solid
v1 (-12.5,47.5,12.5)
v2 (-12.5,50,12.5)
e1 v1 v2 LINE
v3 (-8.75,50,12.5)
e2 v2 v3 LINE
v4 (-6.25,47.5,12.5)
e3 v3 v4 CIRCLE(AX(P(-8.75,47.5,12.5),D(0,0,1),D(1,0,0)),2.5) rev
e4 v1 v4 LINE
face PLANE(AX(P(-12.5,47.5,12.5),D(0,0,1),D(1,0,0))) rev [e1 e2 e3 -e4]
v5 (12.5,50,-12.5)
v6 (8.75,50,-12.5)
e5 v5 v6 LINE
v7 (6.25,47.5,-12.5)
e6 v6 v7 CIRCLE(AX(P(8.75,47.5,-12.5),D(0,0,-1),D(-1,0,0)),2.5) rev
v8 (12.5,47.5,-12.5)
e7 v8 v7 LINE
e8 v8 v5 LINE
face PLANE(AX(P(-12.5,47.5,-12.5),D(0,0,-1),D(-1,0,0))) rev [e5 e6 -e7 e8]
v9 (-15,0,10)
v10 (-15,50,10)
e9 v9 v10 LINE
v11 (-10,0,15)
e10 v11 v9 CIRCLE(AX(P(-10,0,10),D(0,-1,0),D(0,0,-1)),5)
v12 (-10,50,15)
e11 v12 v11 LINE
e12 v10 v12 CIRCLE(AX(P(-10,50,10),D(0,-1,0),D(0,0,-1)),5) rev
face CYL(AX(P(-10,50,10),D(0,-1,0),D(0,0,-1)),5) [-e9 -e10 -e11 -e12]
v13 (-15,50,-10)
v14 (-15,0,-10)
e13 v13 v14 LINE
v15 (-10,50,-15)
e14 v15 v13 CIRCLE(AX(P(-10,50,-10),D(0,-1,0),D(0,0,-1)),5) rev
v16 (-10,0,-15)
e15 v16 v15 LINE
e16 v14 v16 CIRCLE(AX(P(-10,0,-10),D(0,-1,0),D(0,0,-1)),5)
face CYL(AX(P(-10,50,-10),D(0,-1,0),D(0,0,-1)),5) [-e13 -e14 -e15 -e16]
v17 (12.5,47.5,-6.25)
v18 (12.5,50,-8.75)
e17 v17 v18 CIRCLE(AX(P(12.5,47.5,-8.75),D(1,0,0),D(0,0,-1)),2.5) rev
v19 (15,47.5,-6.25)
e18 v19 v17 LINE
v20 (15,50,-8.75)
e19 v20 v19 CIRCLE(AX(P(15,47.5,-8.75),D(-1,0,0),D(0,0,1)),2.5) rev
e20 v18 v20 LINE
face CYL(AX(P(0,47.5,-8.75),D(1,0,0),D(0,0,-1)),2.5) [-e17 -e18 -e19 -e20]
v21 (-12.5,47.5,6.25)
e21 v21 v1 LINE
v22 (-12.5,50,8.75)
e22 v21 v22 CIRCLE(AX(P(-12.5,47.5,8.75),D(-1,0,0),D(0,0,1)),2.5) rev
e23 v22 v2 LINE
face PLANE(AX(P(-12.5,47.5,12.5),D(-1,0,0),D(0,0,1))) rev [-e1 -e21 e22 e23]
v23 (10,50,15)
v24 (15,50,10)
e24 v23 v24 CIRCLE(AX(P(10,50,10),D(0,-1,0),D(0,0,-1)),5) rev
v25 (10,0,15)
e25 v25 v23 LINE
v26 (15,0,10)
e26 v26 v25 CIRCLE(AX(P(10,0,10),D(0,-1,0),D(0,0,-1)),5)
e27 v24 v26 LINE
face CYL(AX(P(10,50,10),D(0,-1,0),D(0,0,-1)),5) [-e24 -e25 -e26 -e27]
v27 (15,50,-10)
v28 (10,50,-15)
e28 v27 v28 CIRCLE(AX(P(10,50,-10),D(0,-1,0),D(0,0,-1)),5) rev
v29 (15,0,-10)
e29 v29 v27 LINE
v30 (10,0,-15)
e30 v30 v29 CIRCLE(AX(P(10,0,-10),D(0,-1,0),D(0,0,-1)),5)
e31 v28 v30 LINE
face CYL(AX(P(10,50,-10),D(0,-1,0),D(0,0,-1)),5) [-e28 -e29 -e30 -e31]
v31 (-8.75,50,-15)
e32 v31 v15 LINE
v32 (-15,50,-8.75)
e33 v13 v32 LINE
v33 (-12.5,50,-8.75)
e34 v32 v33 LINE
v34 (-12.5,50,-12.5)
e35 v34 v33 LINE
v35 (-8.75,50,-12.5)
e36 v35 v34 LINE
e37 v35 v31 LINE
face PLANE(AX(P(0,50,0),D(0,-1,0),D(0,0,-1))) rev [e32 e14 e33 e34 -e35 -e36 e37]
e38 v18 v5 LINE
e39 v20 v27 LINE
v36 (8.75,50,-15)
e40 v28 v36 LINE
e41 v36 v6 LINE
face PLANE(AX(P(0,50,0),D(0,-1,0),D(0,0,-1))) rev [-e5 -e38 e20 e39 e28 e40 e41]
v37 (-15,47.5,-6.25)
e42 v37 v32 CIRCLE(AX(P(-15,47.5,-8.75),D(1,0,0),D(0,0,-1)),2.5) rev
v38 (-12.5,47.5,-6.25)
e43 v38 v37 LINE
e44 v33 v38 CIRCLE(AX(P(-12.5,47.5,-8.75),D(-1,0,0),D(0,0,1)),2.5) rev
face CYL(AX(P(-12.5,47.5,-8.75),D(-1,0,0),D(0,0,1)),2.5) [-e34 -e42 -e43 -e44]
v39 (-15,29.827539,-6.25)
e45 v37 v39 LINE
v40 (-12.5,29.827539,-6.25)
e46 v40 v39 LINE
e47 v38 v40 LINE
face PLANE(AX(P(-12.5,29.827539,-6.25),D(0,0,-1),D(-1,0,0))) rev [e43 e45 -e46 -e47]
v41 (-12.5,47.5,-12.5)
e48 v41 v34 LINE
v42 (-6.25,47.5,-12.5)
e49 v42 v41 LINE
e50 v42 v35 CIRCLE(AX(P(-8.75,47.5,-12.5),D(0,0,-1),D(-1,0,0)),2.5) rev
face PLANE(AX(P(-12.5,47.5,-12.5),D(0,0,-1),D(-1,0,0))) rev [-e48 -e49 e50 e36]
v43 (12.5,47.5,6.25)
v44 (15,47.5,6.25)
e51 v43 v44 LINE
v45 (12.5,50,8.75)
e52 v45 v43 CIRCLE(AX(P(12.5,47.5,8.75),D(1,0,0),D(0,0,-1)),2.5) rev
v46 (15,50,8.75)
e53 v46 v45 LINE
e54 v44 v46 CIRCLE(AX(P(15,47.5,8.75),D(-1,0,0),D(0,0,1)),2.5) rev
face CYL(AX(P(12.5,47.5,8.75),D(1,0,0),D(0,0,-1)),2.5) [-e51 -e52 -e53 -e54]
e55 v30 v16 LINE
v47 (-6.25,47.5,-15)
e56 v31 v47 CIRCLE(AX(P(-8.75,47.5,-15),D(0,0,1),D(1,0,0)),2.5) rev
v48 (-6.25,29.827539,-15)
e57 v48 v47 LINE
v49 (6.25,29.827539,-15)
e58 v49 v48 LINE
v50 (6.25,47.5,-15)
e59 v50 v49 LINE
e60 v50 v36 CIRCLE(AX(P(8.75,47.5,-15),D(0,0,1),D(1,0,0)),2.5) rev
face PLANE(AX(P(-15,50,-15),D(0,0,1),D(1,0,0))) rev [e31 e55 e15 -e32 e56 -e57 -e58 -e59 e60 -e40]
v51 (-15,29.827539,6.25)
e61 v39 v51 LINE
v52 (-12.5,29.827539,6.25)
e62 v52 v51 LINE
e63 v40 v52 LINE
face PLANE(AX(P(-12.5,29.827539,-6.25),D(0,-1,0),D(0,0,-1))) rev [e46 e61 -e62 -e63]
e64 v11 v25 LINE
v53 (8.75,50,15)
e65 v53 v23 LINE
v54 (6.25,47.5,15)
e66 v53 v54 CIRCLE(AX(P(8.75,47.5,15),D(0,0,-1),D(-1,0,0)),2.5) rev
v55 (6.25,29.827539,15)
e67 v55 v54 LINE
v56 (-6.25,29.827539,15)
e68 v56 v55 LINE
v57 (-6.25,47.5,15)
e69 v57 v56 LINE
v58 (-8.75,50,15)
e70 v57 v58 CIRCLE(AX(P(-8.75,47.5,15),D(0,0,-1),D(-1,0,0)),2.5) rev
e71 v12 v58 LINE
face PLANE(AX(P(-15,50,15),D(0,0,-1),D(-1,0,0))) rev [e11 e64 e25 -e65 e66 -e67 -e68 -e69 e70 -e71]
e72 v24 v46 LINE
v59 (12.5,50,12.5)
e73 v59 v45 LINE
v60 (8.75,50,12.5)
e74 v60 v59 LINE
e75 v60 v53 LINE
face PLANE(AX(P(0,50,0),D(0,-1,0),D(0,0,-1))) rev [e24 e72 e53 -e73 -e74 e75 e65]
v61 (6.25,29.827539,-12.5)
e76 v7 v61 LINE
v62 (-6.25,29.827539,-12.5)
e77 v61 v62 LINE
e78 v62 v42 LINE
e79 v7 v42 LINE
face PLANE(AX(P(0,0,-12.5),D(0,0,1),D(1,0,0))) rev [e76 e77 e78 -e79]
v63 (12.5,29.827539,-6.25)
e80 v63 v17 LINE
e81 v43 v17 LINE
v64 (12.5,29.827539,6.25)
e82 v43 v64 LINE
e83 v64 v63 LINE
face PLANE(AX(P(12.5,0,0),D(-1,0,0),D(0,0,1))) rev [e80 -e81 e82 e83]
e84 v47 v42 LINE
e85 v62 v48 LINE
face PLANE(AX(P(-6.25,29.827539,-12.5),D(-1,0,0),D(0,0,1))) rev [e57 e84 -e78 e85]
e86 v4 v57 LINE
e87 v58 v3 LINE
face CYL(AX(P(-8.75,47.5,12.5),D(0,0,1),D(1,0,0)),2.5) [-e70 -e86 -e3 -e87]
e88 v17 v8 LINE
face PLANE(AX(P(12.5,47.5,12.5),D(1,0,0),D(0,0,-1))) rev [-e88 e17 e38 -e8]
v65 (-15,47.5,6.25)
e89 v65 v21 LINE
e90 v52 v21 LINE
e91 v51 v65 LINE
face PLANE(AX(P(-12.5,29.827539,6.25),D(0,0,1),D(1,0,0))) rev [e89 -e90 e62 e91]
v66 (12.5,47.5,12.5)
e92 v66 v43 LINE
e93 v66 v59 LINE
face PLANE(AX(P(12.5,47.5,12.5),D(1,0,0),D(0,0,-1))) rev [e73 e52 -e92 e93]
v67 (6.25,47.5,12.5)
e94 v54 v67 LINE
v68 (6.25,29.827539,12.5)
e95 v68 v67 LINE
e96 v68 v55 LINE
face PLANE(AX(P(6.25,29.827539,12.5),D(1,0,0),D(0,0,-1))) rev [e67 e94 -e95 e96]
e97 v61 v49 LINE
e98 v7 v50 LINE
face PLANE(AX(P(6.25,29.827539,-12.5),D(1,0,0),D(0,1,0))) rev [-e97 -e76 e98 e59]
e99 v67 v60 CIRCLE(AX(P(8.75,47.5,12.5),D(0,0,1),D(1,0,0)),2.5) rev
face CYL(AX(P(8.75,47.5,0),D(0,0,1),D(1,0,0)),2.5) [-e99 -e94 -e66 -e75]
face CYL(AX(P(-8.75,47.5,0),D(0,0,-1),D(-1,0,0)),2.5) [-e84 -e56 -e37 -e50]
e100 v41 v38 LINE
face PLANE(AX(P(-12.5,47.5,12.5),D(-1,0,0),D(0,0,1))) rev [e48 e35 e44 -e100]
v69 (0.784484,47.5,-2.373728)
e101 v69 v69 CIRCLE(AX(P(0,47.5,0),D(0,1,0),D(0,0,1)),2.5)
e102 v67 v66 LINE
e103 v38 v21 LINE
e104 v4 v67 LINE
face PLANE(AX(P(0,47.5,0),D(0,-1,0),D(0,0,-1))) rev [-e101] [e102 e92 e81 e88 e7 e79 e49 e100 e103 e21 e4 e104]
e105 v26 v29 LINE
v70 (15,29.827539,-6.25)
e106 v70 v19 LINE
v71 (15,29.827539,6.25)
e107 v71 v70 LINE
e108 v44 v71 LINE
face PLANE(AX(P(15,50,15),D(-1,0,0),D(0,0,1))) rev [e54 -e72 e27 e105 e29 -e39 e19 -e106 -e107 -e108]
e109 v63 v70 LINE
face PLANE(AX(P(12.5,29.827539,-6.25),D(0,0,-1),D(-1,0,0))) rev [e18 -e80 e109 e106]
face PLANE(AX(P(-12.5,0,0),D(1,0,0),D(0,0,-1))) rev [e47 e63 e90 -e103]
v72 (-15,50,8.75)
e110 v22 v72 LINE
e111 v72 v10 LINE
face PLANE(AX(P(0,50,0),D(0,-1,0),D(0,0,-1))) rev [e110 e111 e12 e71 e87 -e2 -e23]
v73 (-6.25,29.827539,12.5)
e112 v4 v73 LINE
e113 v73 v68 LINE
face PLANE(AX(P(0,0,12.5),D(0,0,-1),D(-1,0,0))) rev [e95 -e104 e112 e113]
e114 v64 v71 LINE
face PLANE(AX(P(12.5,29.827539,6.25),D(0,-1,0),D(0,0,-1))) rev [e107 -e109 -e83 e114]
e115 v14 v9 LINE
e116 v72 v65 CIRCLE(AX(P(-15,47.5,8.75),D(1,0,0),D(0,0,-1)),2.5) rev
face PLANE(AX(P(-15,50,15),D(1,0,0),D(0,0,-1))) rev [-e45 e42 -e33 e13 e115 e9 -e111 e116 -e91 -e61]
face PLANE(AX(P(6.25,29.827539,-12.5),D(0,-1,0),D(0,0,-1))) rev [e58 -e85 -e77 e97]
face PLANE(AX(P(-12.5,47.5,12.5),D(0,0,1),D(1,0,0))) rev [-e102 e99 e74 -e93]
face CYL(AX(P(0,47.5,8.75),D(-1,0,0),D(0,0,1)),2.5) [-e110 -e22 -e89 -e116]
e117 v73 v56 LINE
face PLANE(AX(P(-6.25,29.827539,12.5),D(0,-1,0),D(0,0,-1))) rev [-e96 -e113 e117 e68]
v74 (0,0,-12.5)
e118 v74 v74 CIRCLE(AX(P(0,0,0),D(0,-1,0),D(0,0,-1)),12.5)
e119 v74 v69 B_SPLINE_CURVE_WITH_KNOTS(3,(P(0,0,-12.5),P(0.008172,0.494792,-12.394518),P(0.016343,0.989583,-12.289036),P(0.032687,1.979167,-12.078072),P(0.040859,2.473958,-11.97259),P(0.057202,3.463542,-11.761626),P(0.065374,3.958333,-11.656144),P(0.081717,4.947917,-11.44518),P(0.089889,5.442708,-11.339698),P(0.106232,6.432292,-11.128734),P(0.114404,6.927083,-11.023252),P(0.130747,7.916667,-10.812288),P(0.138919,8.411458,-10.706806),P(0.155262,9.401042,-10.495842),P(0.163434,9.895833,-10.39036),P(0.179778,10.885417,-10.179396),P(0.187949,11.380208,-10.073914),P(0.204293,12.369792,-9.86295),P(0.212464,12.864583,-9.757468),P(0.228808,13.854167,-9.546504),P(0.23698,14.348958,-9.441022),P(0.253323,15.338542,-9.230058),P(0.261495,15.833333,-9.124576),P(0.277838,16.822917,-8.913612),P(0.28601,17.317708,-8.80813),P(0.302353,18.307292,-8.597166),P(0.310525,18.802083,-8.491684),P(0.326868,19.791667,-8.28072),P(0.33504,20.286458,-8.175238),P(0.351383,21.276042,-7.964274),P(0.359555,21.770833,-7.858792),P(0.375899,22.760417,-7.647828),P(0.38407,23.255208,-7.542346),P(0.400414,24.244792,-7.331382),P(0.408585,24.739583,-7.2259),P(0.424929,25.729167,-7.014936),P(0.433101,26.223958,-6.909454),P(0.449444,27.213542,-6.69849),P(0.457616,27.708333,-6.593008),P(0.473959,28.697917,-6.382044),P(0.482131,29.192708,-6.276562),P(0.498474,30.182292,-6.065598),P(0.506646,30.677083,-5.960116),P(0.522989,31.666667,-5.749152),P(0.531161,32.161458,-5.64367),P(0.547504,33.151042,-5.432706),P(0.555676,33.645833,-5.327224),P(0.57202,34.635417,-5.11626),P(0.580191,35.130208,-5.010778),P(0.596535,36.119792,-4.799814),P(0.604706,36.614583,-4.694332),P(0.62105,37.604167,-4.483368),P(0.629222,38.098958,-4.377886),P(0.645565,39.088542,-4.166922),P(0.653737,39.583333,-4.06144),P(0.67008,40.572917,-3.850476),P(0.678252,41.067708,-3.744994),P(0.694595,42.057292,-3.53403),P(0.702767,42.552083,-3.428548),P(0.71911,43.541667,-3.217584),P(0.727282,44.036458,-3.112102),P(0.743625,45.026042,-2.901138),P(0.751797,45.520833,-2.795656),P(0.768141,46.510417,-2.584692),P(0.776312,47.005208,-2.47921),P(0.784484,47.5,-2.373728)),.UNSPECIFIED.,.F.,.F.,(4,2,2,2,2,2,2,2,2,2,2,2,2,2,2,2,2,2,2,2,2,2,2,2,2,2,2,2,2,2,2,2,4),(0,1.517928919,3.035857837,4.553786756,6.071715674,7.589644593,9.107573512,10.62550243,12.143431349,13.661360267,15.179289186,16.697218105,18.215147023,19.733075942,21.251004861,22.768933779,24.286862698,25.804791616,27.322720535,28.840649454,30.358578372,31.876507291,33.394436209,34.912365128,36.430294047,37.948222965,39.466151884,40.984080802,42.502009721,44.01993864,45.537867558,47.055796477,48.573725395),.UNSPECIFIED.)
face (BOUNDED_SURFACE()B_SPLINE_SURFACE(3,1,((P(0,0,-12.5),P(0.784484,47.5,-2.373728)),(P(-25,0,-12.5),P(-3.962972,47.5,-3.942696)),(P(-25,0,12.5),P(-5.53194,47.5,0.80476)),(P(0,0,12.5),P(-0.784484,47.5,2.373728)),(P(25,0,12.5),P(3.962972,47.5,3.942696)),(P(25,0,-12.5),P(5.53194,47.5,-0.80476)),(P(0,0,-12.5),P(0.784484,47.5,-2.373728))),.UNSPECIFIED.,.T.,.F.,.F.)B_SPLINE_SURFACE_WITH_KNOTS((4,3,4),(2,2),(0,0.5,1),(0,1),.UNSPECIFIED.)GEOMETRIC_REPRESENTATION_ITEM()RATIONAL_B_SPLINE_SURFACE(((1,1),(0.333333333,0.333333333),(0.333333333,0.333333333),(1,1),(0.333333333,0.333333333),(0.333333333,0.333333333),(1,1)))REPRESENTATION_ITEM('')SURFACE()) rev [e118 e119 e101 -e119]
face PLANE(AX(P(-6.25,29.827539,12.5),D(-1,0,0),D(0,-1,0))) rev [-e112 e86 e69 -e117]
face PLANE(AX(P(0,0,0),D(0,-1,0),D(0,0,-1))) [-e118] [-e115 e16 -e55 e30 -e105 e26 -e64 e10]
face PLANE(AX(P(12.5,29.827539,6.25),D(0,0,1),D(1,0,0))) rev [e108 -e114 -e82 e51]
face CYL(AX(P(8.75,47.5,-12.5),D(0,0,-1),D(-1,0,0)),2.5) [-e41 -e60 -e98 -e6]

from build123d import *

# Parameters (mm, degrees)
SKETCH2_W           = 30
SKETCH2_H           = 30
BOSS_EXTRUDE1_DEPTH = 50
SKETCH3_W           = 25
SKETCH3_H           = 25
CUT_EXTRUDE1_DEPTH  = 2.5
FILLET1_R           = 5
SKETCH9_W           = 12.5
SKETCH9_H           = 20.172460503
CUT_EXTRUDE2_DEPTH  = 2.5
CIRPATTERN1_COUNT   = 4
FILLET2_R           = 2.5


with BuildPart() as part:
    # Sketch2 → Boss-Extrude1 (new body)
    with BuildSketch(Plane(origin=(0, 0, 0), x_dir=(1, 0, 0), z_dir=(0, 1, 0))):
        Rectangle(SKETCH2_W, SKETCH2_H)
    extrude(amount=BOSS_EXTRUDE1_DEPTH)

    # Sketch3 → Cut-Extrude1 (cut)
    with BuildSketch(Plane(origin=(0, 50, 0), x_dir=(1, 0, 0), z_dir=(0, 1, 0))):
        Rectangle(SKETCH3_W, SKETCH3_H)
    extrude(amount=-CUT_EXTRUDE1_DEPTH, mode=Mode.SUBTRACT)

    # Fillet1
    fillet1_edges = [part.edges().sort_by_distance(p)[0] for p in [
        (15, 25, 15),
        (-15, 25, 15),
        (-15, 25, -15),
        (15, 25, -15),
    ]]
    fillet(fillet1_edges, radius=FILLET1_R)

    # Cut-Loft2: read off the stored shape, not the designer's step
    # Cut-Loft2: loft between two sections, ruled curve by curve
    cut_loft2_from = [
        Edge.make_bspline([(0, 0, -12.5), (-25, 0, -12.5), (-25, 0, 12.5), (0, 0, 12.5), (25, 0, 12.5), (25, 0, -12.5), (0, 0, -12.5)], [0, 0, 0, 0, 0.5, 0.5, 0.5, 1, 1, 1, 1], 3, [1, 0.333333333, 0.333333333, 1, 0.333333333, 0.333333333, 1]),
    ]
    cut_loft2_to = [
        Edge.make_bspline([(0.784484005, 47.5, -2.373728048), (-3.962972092, 47.5, -3.942696057), (-5.531940101, 47.5, 0.804760039), (-0.784484005, 47.5, 2.373728048), (3.962972092, 47.5, 3.942696057), (5.531940101, 47.5, -0.804760039), (0.784484005, 47.5, -2.373728048)], [0, 0, 0, 0, 0.5, 0.5, 0.5, 1, 1, 1, 1], 3, [1, 0.333333333, 0.333333333, 1, 0.333333333, 0.333333333, 1]),
    ]
    cut_loft2 = Solid(Shell([*[Face.make_surface_from_curves(cut_loft2_from[k], cut_loft2_to[k]) for k in range(1)], Face(Wire(cut_loft2_from)), Face(Wire(cut_loft2_to))]))
    add(cut_loft2, mode=Mode.SUBTRACT)

    # Sketch9 → Cut-Extrude2 (cut)
    with BuildSketch(Plane.XY.offset(15)):
        with Locations((0, 39.913769749)):
            Rectangle(SKETCH9_W, SKETCH9_H)
    cut_extrude2 = extrude(amount=-CUT_EXTRUDE2_DEPTH, mode=Mode.SUBTRACT)

    # CirPattern1: Cut-Loft2, Cut-Extrude2 ×4 about axis
    cirpattern1_axis = Axis((0, 0, 0), (0, 1, 0))
    add([cut_loft2.rotate(cirpattern1_axis, i * 360 / CIRPATTERN1_COUNT) for i in range(1, CIRPATTERN1_COUNT)], mode=Mode.SUBTRACT)
    add([cut_extrude2.rotate(cirpattern1_axis, i * 360 / CIRPATTERN1_COUNT) for i in range(1, CIRPATTERN1_COUNT)], mode=Mode.SUBTRACT)

    # Fillet2
    fillet2_edges = [part.edges().sort_by_distance(p)[0] for p in [
        (13.75, 50, 6.25),
        (13.75, 50, -6.25),
        (6.25, 50, -13.75),
        (-6.25, 50, -13.75),
        (-13.75, 50, -6.25),
        (-13.75, 50, 6.25),
        (-6.25, 50, 13.75),
        (6.25, 50, 13.75),
    ]]
    fillet(fillet2_edges, radius=FILLET2_R)


solid = part.part
